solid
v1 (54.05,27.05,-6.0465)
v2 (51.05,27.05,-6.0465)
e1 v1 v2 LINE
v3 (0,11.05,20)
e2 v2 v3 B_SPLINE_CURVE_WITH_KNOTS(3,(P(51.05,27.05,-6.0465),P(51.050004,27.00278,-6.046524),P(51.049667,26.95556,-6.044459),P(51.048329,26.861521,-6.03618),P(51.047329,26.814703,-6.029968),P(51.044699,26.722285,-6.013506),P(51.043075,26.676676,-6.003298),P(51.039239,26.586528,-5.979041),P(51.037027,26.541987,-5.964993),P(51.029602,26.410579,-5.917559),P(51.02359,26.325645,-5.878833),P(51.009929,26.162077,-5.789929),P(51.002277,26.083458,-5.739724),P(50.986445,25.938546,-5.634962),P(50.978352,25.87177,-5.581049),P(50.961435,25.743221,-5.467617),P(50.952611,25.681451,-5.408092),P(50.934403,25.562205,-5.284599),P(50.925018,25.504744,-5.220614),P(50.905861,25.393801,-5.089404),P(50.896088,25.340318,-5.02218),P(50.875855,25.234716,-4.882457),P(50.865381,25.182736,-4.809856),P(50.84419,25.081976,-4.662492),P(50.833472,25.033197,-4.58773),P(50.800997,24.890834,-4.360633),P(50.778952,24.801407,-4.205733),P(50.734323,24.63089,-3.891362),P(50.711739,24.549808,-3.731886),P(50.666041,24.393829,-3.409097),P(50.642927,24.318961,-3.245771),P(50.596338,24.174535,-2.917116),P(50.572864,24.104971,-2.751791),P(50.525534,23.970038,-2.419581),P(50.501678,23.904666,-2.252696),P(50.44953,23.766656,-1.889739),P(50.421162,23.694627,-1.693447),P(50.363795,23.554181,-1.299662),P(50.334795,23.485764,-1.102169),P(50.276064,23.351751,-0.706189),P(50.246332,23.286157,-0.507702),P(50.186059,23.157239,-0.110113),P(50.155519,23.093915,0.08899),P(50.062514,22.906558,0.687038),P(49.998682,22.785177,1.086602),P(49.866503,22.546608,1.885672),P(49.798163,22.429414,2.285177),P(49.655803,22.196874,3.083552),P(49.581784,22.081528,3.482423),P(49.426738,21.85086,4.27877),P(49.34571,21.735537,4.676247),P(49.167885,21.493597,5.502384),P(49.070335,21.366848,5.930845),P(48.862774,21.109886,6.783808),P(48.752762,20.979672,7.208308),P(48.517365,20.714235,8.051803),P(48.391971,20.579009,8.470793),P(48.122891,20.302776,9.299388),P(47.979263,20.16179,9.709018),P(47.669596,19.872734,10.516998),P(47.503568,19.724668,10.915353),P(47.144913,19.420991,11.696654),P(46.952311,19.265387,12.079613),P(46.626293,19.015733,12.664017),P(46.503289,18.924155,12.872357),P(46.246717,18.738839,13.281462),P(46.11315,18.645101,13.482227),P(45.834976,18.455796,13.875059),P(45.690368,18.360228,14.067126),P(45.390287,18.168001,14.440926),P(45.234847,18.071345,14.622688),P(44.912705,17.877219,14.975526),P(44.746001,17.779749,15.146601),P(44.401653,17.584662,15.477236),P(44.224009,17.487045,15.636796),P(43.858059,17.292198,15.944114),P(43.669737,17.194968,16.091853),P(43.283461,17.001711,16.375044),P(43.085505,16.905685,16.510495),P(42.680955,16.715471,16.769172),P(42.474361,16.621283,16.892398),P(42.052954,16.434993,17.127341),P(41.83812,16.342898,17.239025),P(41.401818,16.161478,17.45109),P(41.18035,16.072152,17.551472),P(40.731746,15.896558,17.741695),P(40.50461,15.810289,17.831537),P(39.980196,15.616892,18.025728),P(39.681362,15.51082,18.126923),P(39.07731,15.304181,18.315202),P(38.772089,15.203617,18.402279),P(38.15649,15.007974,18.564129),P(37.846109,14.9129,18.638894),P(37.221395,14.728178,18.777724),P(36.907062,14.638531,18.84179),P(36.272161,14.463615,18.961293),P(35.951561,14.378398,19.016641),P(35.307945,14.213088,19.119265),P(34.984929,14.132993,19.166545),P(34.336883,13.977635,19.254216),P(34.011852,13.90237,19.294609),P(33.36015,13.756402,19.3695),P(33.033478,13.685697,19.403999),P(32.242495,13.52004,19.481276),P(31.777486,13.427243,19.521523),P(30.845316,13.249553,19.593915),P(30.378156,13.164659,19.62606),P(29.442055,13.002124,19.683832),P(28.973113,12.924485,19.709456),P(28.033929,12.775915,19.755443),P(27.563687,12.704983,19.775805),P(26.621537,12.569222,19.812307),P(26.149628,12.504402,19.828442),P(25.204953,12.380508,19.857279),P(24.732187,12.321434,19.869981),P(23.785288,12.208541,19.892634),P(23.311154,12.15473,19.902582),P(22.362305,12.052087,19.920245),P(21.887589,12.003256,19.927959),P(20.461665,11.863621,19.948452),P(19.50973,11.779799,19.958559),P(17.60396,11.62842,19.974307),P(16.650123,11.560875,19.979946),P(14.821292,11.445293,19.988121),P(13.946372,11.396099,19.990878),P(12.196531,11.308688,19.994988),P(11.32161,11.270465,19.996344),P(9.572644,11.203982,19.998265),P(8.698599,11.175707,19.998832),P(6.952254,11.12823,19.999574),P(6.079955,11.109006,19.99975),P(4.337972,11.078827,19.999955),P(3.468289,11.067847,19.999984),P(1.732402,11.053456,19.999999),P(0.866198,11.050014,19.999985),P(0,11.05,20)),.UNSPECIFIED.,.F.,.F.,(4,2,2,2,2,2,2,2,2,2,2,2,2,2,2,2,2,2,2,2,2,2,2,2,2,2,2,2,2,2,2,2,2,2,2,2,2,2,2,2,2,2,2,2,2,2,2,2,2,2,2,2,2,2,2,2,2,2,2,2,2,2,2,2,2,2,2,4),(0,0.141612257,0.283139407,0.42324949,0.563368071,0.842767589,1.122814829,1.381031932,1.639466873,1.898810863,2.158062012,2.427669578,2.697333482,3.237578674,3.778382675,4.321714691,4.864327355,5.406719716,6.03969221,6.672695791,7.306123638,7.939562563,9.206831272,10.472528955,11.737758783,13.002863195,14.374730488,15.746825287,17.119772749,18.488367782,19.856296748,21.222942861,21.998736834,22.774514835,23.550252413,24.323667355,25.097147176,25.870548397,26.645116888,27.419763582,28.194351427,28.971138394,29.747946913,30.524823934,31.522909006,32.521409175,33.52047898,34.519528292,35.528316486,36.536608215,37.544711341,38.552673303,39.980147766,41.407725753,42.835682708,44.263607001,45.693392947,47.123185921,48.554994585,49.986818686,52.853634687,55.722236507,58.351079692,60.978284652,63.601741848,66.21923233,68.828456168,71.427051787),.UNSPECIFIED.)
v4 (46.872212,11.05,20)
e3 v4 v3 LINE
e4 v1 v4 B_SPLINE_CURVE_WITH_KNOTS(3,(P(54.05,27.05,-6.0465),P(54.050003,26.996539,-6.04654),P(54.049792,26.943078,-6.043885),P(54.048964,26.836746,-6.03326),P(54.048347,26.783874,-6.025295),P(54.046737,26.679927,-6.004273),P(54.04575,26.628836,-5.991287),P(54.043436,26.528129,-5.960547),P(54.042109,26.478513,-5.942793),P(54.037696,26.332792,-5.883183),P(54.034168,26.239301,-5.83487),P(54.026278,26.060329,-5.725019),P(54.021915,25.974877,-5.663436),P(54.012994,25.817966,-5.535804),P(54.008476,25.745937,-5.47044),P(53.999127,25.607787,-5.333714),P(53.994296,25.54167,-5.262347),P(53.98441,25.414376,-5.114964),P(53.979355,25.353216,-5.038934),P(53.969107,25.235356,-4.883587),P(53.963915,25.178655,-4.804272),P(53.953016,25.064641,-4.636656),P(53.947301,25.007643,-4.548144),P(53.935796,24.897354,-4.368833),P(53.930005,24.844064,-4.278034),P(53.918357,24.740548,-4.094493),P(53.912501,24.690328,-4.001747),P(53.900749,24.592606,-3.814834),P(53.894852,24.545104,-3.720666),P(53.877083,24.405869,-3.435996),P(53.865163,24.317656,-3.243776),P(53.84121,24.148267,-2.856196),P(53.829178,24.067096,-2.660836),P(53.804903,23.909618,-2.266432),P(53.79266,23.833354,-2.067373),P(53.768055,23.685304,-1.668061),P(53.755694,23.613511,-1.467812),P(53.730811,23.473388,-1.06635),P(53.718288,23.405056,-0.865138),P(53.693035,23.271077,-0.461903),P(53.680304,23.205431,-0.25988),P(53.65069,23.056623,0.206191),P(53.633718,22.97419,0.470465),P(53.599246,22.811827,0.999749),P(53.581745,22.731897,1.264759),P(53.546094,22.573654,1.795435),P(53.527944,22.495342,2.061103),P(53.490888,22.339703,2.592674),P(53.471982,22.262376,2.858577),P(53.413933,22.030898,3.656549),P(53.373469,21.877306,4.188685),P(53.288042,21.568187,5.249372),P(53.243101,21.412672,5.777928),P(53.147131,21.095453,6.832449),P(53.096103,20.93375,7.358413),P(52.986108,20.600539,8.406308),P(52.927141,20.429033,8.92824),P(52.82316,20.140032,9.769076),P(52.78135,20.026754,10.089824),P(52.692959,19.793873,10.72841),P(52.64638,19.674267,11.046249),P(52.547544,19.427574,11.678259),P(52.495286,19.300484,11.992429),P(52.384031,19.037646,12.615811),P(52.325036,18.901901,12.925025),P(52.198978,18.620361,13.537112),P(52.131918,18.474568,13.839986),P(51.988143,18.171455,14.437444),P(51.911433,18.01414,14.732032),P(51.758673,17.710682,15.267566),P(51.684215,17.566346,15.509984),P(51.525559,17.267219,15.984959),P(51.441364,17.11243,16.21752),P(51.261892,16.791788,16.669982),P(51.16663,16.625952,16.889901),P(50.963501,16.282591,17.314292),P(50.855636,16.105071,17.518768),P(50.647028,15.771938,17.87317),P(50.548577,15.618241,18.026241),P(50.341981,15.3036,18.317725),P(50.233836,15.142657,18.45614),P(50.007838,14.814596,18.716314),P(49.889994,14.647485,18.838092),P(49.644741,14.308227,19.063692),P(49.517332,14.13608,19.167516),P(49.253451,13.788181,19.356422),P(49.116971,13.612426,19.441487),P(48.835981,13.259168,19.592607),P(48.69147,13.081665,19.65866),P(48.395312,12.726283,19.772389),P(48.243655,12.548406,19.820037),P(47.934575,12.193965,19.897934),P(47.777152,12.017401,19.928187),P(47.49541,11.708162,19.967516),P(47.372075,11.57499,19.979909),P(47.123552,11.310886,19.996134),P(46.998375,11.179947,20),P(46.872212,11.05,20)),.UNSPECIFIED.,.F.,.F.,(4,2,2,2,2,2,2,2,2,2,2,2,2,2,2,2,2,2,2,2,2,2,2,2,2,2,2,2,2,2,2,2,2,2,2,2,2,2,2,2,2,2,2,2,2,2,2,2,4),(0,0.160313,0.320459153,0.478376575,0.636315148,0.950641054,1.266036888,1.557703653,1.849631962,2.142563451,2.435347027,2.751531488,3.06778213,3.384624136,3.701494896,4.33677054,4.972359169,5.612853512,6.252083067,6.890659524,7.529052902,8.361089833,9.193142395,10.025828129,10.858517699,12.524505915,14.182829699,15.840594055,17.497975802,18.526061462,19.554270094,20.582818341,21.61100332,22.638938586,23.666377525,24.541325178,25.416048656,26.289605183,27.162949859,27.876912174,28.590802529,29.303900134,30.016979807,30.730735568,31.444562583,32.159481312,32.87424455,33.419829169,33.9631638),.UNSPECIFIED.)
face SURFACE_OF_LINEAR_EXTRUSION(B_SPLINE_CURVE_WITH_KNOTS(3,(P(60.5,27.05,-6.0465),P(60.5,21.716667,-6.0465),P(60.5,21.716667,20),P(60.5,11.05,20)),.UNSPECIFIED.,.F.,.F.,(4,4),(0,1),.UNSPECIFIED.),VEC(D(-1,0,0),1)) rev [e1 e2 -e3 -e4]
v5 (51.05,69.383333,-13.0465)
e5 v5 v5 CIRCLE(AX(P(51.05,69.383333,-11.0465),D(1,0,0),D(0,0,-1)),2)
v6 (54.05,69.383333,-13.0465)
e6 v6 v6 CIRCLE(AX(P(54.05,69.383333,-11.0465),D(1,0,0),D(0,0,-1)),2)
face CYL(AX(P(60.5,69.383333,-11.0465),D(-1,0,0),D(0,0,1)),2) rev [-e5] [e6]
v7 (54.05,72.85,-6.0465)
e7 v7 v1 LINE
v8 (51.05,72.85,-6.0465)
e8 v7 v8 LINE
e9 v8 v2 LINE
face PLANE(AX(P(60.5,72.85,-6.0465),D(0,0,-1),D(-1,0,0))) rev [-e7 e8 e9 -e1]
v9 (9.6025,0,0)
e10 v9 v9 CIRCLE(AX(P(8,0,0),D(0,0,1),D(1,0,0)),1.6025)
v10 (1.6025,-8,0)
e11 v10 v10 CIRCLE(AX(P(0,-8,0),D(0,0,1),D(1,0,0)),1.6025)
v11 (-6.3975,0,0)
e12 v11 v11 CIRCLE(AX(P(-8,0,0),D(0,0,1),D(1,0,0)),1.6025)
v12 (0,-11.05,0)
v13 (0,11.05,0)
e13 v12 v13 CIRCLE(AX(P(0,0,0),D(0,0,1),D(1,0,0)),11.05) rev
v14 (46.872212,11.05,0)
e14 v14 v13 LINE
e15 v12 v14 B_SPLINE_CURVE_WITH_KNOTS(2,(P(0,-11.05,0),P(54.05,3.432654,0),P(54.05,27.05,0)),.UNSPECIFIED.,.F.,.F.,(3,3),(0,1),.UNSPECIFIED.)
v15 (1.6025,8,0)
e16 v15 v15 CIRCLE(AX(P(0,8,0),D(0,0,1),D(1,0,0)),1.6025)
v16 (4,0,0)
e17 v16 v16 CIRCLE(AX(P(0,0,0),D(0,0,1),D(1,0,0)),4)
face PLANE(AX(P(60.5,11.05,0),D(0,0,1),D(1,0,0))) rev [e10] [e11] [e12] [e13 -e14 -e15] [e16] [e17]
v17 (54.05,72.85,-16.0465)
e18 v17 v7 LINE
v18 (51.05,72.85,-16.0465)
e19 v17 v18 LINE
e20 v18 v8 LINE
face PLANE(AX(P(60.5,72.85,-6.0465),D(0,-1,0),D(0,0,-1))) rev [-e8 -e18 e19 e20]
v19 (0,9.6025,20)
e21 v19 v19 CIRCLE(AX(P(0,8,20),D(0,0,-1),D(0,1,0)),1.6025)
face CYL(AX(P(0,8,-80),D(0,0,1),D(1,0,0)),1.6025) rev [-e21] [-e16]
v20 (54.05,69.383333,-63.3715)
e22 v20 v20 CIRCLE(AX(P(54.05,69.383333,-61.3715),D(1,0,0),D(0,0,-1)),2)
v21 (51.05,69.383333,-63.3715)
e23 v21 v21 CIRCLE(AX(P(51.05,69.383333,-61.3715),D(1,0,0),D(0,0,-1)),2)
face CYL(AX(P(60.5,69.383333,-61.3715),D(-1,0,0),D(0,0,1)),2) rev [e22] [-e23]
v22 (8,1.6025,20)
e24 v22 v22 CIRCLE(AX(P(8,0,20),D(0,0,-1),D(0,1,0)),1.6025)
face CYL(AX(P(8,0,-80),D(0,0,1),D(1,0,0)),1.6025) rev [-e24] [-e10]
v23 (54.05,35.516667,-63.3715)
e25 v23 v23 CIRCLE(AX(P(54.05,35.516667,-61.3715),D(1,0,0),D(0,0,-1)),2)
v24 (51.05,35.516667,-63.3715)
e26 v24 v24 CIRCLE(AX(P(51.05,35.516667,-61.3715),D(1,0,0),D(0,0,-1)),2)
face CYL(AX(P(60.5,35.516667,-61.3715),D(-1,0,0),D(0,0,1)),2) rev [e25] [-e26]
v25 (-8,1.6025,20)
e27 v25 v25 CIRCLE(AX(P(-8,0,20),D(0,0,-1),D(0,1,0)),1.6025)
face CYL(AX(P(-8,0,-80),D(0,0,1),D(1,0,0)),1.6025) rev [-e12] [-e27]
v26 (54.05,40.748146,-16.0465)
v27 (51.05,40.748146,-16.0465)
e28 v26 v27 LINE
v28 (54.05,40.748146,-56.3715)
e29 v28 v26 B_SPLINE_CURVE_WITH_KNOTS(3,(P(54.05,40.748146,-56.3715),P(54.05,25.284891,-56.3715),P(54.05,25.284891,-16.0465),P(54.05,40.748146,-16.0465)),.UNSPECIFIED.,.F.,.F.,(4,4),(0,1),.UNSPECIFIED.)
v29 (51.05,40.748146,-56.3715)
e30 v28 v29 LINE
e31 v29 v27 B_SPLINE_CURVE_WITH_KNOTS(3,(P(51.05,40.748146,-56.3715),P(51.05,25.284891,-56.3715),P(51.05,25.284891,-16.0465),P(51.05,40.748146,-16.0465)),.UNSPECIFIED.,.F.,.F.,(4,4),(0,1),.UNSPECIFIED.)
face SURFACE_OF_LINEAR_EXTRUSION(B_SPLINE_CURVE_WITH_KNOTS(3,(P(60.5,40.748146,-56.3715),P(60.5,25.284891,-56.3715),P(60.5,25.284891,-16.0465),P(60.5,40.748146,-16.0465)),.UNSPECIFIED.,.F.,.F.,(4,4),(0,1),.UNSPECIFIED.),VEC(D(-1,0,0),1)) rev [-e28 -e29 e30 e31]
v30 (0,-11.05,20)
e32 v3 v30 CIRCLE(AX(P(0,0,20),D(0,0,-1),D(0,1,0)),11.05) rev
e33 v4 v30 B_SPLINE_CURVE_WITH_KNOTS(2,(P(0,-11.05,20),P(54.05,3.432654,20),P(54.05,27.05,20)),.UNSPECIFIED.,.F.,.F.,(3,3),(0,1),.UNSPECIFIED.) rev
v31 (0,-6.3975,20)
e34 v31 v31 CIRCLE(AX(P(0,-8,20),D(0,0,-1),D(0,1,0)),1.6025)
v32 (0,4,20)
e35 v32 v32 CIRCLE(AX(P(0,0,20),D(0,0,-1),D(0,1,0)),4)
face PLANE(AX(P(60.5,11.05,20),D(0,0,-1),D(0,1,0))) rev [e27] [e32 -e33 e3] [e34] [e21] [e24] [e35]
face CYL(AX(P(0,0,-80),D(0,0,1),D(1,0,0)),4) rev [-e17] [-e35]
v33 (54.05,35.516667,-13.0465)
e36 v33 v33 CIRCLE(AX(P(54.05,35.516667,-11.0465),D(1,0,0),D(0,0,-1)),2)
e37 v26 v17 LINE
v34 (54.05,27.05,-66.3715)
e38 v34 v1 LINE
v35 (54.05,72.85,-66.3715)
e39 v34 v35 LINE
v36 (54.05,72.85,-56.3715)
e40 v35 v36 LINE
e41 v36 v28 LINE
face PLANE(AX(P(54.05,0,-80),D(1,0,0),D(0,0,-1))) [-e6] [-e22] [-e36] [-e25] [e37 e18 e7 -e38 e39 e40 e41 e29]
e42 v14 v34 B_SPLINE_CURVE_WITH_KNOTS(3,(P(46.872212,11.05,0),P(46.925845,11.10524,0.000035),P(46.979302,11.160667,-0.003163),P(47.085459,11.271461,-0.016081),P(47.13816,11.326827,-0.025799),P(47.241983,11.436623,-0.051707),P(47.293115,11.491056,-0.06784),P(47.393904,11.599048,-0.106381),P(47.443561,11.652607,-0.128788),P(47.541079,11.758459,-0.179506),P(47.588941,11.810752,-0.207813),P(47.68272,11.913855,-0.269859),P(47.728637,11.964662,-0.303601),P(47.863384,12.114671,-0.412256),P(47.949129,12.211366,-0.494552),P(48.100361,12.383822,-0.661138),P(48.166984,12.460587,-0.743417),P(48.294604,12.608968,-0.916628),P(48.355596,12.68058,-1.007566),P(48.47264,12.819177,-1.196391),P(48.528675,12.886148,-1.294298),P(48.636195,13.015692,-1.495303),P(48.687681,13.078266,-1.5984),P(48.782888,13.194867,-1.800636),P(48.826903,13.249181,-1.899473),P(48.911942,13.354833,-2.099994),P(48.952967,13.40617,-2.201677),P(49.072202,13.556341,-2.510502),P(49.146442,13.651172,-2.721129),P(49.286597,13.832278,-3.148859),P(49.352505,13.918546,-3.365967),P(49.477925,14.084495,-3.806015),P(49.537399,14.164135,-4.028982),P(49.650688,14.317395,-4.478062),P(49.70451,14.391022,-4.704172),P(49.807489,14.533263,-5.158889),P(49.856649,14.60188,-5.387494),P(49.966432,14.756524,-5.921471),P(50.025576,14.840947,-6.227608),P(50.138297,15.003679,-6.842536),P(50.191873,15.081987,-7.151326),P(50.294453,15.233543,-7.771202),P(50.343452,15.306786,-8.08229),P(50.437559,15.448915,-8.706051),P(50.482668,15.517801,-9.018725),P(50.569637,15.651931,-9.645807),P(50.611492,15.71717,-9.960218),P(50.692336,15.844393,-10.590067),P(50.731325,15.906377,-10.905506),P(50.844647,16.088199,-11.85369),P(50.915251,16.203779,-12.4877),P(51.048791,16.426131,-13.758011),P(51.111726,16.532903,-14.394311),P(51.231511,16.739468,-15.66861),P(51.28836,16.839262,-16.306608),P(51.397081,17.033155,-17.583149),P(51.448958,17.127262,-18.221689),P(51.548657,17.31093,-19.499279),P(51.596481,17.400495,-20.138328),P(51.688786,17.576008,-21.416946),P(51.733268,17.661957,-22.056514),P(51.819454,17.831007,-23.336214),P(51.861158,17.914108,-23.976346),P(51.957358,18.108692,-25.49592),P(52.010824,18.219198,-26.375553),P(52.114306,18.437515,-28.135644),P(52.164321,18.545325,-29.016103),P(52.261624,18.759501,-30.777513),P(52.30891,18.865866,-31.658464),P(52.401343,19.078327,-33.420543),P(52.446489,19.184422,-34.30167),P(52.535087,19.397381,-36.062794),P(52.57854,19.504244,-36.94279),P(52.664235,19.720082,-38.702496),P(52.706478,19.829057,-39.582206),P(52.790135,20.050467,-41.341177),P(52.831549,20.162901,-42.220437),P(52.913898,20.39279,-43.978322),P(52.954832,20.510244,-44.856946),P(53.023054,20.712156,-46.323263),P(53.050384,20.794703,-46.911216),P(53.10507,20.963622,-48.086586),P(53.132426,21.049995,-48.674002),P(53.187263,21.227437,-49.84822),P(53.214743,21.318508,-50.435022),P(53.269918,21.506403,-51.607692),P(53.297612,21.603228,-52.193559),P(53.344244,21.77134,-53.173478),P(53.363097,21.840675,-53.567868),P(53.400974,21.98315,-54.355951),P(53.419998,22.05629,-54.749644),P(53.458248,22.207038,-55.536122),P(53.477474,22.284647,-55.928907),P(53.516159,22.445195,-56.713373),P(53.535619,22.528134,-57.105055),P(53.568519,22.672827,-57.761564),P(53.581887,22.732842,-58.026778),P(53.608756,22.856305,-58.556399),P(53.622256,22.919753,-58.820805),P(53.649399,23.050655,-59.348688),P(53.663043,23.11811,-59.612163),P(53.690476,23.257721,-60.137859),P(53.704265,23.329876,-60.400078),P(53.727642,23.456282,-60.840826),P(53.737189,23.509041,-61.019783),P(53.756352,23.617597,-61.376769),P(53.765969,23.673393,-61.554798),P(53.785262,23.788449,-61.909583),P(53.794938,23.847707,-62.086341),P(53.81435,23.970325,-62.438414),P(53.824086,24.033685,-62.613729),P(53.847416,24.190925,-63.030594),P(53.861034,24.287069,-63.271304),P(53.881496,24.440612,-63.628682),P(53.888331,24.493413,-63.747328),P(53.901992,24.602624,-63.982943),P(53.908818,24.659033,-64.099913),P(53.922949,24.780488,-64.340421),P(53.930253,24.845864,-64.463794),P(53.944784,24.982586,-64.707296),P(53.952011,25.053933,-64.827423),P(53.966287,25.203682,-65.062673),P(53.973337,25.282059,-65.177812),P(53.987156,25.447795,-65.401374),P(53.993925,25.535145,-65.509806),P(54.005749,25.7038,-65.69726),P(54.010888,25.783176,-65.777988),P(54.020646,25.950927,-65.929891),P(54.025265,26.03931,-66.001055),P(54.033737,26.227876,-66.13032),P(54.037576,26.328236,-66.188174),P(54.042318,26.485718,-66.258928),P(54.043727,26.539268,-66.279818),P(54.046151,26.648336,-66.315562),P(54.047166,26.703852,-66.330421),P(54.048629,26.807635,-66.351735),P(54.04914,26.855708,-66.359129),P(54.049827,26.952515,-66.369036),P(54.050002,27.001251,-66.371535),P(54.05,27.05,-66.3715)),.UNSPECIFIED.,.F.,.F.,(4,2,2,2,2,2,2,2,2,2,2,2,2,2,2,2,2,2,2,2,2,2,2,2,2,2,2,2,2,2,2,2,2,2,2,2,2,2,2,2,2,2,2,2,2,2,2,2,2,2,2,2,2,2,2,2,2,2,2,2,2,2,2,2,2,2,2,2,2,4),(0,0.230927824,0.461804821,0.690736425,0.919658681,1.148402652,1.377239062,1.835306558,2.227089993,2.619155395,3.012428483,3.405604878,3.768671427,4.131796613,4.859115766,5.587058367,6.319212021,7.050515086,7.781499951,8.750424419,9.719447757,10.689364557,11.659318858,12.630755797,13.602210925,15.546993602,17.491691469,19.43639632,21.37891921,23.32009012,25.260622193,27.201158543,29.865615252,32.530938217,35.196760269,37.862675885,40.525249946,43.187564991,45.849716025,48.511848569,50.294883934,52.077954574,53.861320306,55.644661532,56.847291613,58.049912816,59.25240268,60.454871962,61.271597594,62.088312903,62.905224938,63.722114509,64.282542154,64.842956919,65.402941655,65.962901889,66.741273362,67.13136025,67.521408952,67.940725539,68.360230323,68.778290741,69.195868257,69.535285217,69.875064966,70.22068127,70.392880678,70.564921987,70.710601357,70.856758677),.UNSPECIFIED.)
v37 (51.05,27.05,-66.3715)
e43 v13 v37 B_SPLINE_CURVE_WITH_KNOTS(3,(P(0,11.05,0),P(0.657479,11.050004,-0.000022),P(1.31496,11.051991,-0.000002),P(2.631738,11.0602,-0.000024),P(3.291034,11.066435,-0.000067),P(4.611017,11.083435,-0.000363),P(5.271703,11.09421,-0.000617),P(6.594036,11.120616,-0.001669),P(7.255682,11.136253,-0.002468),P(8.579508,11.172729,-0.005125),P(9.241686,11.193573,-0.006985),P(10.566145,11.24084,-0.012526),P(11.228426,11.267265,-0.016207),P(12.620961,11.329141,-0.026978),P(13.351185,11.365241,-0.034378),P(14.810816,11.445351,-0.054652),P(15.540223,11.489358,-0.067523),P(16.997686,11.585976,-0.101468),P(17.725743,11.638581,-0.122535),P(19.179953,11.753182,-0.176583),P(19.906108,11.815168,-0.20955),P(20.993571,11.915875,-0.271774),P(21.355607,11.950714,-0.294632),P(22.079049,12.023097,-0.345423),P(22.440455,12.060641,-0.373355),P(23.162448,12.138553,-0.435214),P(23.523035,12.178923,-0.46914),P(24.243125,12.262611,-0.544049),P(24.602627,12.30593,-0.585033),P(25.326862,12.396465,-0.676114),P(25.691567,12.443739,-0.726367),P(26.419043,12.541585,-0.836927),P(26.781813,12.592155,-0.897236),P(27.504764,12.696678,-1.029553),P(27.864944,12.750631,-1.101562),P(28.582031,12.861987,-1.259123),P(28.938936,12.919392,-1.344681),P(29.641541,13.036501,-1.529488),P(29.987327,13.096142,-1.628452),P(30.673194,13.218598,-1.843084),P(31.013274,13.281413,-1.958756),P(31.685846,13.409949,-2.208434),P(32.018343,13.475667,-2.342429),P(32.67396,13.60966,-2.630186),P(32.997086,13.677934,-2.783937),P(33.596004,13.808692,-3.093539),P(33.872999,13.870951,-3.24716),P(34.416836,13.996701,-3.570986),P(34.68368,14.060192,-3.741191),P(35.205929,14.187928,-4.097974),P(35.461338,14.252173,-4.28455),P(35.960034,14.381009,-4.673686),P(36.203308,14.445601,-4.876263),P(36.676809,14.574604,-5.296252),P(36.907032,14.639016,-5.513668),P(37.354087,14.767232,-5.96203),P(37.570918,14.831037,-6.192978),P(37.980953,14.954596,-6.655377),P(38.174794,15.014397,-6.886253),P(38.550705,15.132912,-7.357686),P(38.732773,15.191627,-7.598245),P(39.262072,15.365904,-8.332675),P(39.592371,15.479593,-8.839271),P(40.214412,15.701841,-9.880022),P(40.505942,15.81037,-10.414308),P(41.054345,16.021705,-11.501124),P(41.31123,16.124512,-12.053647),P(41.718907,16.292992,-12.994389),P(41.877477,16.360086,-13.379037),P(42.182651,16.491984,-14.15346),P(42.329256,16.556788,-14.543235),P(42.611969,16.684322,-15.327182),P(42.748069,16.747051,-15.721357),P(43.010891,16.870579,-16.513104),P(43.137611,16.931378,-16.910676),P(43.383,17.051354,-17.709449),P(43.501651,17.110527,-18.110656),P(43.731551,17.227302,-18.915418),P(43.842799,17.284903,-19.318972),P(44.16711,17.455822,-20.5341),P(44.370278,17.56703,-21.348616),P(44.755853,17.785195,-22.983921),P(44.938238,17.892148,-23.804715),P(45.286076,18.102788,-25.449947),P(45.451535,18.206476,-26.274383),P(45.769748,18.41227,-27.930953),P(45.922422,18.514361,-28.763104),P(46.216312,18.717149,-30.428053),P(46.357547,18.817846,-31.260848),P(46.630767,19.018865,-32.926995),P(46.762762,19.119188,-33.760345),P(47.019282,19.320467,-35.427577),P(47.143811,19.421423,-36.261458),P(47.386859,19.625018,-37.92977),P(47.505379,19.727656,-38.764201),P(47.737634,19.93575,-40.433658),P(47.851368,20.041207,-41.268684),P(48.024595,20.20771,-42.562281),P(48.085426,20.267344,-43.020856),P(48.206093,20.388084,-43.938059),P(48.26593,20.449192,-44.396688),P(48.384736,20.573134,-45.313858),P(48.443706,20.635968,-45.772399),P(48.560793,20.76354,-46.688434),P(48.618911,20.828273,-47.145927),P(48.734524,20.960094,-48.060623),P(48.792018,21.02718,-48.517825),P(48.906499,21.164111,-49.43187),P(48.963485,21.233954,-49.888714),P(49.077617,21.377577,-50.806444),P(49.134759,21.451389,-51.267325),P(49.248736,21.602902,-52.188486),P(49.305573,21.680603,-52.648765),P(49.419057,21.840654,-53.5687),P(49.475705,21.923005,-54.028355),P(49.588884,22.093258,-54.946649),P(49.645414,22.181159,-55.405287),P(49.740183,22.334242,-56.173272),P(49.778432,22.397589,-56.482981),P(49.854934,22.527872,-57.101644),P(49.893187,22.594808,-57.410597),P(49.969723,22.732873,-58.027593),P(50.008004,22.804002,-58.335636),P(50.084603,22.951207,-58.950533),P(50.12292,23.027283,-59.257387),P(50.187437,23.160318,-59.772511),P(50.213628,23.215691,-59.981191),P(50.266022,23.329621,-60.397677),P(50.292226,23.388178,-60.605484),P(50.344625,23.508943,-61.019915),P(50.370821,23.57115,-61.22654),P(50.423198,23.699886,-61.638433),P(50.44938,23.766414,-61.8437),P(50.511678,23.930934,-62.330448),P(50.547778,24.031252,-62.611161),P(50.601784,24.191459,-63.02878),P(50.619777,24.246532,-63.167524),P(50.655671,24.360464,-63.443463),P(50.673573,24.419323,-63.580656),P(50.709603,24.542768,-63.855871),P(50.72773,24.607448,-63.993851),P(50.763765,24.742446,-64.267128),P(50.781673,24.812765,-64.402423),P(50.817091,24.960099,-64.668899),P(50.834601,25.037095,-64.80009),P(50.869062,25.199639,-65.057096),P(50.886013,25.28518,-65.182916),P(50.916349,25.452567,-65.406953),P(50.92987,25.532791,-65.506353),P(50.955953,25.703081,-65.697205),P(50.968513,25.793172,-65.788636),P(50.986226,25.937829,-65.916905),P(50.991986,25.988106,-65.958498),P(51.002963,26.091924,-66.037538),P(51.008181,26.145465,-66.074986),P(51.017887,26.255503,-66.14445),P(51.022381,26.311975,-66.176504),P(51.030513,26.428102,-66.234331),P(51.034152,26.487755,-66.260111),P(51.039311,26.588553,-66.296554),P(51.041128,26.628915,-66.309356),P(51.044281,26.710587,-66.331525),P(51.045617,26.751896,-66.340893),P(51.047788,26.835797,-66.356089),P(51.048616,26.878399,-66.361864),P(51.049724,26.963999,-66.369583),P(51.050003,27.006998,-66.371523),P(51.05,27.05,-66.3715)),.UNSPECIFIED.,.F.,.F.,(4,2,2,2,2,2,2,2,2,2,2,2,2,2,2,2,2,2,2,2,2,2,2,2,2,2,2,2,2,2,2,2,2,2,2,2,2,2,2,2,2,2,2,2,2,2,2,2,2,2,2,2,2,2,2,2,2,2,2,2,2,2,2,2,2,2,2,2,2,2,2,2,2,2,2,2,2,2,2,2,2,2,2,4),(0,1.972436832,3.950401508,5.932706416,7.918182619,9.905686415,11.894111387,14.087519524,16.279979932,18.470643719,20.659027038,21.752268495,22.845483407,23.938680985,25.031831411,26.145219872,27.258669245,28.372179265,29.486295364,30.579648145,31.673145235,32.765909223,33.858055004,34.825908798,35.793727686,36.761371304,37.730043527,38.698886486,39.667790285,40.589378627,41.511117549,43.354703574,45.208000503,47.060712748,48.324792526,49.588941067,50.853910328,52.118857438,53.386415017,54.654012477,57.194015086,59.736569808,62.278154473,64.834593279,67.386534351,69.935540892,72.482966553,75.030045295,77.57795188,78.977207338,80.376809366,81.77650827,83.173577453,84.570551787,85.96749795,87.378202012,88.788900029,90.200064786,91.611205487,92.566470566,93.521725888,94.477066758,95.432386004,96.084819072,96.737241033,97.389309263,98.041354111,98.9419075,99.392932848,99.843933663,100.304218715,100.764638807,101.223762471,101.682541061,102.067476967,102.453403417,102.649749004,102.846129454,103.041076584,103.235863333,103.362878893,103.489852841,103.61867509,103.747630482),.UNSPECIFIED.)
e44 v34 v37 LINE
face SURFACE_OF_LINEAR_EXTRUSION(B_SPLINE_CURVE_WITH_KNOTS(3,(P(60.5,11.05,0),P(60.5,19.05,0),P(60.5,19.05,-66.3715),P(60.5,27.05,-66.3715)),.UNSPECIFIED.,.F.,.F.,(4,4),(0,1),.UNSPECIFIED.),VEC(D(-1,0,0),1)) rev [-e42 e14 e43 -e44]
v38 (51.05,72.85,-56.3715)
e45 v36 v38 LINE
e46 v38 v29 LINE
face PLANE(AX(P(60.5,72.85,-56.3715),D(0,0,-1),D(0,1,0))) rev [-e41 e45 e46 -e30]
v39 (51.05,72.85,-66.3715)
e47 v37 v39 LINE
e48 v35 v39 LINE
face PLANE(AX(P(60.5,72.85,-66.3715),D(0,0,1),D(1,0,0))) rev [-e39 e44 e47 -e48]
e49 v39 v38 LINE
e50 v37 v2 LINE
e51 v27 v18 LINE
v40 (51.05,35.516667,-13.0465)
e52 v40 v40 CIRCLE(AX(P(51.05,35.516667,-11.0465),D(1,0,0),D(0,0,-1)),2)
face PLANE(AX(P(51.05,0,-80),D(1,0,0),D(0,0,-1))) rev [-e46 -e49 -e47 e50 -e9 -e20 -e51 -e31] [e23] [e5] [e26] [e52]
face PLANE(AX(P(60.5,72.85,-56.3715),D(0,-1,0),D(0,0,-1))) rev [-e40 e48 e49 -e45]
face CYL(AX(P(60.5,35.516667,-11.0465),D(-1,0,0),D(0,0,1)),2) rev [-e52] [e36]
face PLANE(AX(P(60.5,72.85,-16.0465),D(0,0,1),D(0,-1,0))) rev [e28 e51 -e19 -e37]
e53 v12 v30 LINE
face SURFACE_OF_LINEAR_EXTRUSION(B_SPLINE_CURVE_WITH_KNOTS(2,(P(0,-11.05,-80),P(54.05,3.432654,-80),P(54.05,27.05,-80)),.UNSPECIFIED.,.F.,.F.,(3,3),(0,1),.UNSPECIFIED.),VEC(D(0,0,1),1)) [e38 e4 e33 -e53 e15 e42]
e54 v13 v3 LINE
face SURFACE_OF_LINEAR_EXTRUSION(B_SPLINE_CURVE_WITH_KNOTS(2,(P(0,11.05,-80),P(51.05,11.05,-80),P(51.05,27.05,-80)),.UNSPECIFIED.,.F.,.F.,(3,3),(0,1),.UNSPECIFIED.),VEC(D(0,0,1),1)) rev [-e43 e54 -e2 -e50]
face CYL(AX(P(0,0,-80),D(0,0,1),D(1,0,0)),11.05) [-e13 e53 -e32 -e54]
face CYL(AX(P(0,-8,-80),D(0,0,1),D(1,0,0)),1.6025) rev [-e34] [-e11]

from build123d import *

# Parameters (mm, degrees)
BOSS_EXTRUDE1_START     = -60.5
BOSS_EXTRUDE1_OUTLINE_R = 2
BOSS_EXTRUDE1_DEPTH     = 121
SKETCH1_W               = 179.187175662
SKETCH1_H               = 206.234296517
SKETCH1_R               = 1.6025
SKETCH1_R_2             = 4
CUT_EXTRUDE1_DEPTH      = 80


# Read off the part's stored shape, not the designer's step: Boss-Extrude1
with BuildPart() as part:
    # Boss-Extrude1 outline → Boss-Extrude1 (new body)
    with BuildSketch(Plane(origin=(0, 0, 0), x_dir=(0, 0, -1), z_dir=(1, 0, 0)).offset(BOSS_EXTRUDE1_START)):
        with BuildLine():
            Line((6.0465, 72.85), (6.0465, 27.05))
            add(Edge.make_bspline(
                [(6.0465, 27.05), (6.0465, 21.716666667), (-20, 21.716666667), (-20, 11.05)],
                knots=[0, 0, 0, 0, 1, 1, 1, 1], degree=3))
            Line((-20, 11.05), (-20, -11.05))
            Line((-20, -11.05), (0, -11.05))
            Line((0, -11.05), (0, 11.05))
            add(Edge.make_bspline(
                [(0, 11.05), (0, 19.05), (66.3715, 19.05), (66.3715, 27.05)],
                knots=[0, 0, 0, 0, 1, 1, 1, 1], degree=3))
            Line((66.3715, 27.05), (66.3715, 72.85))
            Line((66.3715, 72.85), (56.3715, 72.85))
            Line((56.3715, 72.85), (56.3715, 40.748146134))
            add(Edge.make_bspline(
                [(56.3715, 40.748146134), (56.3715, 25.284890874), (16.0465, 25.284890874), (16.0465, 40.748146134)],
                knots=[0, 0, 0, 0, 1, 1, 1, 1], degree=3))
            Line((16.0465, 40.748146134), (16.0465, 72.85))
            Line((16.0465, 72.85), (6.0465, 72.85))
        make_face()
        with Locations((11.0465, 35.516666667)):
            Circle(BOSS_EXTRUDE1_OUTLINE_R, mode=Mode.SUBTRACT)
        with Locations((11.0465, 69.383333333)):
            Circle(BOSS_EXTRUDE1_OUTLINE_R, mode=Mode.SUBTRACT)
        with Locations((61.3715, 35.516666667)):
            Circle(BOSS_EXTRUDE1_OUTLINE_R, mode=Mode.SUBTRACT)
        with Locations((61.3715, 69.383333333)):
            Circle(BOSS_EXTRUDE1_OUTLINE_R, mode=Mode.SUBTRACT)
    extrude(amount=BOSS_EXTRUDE1_DEPTH)

    # Sketch1 → Cut-Extrude1 (cut, symmetric)
    # profile 1 of 6: a face of its own
    with BuildSketch(Plane.XY):
        with Locations((-22.097828966, 29.224383364)):
            Rectangle(SKETCH1_W, SKETCH1_H)
        with BuildLine():
            add(Edge.make_bspline(
                [(0, -11.05), (54.05, 3.432653851), (54.05, 27.05)],
                knots=[0, 0, 0, 1, 1, 1], degree=2))
            Line((54.05, 27.05), (54.05, 72.85))
            Line((54.05, 72.85), (51.05, 72.85))
            Line((51.05, 72.85), (51.05, 27.05))
            add(Edge.make_bspline(
                [(0, 11.05), (51.05, 11.05), (51.05, 27.05)],
                knots=[0, 0, 0, 1, 1, 1], degree=2))
            ThreePointArc((0, 11.05), (-11.05, 0), (0, -11.05))
        make_face(mode=Mode.SUBTRACT)
    # profile 2 of 6: a face of its own
    with BuildSketch(Plane.XY):
        with Locations((8, 0)):
            Circle(SKETCH1_R)
    # profile 3 of 6: a face of its own
    with BuildSketch(Plane.XY):
        with Locations((0, 8)):
            Circle(SKETCH1_R)
    # profile 4 of 6: a face of its own
    with BuildSketch(Plane.XY):
        with Locations((-8, 0)):
            Circle(SKETCH1_R)
    # profile 5 of 6: a face of its own
    with BuildSketch(Plane.XY):
        with Locations((0, -8)):
            Circle(SKETCH1_R)
    # profile 6 of 6: a face of its own
    with BuildSketch(Plane.XY):
        Circle(SKETCH1_R_2)
    extrude(amount=CUT_EXTRUDE1_DEPTH, both=True, mode=Mode.SUBTRACT)


solid = part.part
